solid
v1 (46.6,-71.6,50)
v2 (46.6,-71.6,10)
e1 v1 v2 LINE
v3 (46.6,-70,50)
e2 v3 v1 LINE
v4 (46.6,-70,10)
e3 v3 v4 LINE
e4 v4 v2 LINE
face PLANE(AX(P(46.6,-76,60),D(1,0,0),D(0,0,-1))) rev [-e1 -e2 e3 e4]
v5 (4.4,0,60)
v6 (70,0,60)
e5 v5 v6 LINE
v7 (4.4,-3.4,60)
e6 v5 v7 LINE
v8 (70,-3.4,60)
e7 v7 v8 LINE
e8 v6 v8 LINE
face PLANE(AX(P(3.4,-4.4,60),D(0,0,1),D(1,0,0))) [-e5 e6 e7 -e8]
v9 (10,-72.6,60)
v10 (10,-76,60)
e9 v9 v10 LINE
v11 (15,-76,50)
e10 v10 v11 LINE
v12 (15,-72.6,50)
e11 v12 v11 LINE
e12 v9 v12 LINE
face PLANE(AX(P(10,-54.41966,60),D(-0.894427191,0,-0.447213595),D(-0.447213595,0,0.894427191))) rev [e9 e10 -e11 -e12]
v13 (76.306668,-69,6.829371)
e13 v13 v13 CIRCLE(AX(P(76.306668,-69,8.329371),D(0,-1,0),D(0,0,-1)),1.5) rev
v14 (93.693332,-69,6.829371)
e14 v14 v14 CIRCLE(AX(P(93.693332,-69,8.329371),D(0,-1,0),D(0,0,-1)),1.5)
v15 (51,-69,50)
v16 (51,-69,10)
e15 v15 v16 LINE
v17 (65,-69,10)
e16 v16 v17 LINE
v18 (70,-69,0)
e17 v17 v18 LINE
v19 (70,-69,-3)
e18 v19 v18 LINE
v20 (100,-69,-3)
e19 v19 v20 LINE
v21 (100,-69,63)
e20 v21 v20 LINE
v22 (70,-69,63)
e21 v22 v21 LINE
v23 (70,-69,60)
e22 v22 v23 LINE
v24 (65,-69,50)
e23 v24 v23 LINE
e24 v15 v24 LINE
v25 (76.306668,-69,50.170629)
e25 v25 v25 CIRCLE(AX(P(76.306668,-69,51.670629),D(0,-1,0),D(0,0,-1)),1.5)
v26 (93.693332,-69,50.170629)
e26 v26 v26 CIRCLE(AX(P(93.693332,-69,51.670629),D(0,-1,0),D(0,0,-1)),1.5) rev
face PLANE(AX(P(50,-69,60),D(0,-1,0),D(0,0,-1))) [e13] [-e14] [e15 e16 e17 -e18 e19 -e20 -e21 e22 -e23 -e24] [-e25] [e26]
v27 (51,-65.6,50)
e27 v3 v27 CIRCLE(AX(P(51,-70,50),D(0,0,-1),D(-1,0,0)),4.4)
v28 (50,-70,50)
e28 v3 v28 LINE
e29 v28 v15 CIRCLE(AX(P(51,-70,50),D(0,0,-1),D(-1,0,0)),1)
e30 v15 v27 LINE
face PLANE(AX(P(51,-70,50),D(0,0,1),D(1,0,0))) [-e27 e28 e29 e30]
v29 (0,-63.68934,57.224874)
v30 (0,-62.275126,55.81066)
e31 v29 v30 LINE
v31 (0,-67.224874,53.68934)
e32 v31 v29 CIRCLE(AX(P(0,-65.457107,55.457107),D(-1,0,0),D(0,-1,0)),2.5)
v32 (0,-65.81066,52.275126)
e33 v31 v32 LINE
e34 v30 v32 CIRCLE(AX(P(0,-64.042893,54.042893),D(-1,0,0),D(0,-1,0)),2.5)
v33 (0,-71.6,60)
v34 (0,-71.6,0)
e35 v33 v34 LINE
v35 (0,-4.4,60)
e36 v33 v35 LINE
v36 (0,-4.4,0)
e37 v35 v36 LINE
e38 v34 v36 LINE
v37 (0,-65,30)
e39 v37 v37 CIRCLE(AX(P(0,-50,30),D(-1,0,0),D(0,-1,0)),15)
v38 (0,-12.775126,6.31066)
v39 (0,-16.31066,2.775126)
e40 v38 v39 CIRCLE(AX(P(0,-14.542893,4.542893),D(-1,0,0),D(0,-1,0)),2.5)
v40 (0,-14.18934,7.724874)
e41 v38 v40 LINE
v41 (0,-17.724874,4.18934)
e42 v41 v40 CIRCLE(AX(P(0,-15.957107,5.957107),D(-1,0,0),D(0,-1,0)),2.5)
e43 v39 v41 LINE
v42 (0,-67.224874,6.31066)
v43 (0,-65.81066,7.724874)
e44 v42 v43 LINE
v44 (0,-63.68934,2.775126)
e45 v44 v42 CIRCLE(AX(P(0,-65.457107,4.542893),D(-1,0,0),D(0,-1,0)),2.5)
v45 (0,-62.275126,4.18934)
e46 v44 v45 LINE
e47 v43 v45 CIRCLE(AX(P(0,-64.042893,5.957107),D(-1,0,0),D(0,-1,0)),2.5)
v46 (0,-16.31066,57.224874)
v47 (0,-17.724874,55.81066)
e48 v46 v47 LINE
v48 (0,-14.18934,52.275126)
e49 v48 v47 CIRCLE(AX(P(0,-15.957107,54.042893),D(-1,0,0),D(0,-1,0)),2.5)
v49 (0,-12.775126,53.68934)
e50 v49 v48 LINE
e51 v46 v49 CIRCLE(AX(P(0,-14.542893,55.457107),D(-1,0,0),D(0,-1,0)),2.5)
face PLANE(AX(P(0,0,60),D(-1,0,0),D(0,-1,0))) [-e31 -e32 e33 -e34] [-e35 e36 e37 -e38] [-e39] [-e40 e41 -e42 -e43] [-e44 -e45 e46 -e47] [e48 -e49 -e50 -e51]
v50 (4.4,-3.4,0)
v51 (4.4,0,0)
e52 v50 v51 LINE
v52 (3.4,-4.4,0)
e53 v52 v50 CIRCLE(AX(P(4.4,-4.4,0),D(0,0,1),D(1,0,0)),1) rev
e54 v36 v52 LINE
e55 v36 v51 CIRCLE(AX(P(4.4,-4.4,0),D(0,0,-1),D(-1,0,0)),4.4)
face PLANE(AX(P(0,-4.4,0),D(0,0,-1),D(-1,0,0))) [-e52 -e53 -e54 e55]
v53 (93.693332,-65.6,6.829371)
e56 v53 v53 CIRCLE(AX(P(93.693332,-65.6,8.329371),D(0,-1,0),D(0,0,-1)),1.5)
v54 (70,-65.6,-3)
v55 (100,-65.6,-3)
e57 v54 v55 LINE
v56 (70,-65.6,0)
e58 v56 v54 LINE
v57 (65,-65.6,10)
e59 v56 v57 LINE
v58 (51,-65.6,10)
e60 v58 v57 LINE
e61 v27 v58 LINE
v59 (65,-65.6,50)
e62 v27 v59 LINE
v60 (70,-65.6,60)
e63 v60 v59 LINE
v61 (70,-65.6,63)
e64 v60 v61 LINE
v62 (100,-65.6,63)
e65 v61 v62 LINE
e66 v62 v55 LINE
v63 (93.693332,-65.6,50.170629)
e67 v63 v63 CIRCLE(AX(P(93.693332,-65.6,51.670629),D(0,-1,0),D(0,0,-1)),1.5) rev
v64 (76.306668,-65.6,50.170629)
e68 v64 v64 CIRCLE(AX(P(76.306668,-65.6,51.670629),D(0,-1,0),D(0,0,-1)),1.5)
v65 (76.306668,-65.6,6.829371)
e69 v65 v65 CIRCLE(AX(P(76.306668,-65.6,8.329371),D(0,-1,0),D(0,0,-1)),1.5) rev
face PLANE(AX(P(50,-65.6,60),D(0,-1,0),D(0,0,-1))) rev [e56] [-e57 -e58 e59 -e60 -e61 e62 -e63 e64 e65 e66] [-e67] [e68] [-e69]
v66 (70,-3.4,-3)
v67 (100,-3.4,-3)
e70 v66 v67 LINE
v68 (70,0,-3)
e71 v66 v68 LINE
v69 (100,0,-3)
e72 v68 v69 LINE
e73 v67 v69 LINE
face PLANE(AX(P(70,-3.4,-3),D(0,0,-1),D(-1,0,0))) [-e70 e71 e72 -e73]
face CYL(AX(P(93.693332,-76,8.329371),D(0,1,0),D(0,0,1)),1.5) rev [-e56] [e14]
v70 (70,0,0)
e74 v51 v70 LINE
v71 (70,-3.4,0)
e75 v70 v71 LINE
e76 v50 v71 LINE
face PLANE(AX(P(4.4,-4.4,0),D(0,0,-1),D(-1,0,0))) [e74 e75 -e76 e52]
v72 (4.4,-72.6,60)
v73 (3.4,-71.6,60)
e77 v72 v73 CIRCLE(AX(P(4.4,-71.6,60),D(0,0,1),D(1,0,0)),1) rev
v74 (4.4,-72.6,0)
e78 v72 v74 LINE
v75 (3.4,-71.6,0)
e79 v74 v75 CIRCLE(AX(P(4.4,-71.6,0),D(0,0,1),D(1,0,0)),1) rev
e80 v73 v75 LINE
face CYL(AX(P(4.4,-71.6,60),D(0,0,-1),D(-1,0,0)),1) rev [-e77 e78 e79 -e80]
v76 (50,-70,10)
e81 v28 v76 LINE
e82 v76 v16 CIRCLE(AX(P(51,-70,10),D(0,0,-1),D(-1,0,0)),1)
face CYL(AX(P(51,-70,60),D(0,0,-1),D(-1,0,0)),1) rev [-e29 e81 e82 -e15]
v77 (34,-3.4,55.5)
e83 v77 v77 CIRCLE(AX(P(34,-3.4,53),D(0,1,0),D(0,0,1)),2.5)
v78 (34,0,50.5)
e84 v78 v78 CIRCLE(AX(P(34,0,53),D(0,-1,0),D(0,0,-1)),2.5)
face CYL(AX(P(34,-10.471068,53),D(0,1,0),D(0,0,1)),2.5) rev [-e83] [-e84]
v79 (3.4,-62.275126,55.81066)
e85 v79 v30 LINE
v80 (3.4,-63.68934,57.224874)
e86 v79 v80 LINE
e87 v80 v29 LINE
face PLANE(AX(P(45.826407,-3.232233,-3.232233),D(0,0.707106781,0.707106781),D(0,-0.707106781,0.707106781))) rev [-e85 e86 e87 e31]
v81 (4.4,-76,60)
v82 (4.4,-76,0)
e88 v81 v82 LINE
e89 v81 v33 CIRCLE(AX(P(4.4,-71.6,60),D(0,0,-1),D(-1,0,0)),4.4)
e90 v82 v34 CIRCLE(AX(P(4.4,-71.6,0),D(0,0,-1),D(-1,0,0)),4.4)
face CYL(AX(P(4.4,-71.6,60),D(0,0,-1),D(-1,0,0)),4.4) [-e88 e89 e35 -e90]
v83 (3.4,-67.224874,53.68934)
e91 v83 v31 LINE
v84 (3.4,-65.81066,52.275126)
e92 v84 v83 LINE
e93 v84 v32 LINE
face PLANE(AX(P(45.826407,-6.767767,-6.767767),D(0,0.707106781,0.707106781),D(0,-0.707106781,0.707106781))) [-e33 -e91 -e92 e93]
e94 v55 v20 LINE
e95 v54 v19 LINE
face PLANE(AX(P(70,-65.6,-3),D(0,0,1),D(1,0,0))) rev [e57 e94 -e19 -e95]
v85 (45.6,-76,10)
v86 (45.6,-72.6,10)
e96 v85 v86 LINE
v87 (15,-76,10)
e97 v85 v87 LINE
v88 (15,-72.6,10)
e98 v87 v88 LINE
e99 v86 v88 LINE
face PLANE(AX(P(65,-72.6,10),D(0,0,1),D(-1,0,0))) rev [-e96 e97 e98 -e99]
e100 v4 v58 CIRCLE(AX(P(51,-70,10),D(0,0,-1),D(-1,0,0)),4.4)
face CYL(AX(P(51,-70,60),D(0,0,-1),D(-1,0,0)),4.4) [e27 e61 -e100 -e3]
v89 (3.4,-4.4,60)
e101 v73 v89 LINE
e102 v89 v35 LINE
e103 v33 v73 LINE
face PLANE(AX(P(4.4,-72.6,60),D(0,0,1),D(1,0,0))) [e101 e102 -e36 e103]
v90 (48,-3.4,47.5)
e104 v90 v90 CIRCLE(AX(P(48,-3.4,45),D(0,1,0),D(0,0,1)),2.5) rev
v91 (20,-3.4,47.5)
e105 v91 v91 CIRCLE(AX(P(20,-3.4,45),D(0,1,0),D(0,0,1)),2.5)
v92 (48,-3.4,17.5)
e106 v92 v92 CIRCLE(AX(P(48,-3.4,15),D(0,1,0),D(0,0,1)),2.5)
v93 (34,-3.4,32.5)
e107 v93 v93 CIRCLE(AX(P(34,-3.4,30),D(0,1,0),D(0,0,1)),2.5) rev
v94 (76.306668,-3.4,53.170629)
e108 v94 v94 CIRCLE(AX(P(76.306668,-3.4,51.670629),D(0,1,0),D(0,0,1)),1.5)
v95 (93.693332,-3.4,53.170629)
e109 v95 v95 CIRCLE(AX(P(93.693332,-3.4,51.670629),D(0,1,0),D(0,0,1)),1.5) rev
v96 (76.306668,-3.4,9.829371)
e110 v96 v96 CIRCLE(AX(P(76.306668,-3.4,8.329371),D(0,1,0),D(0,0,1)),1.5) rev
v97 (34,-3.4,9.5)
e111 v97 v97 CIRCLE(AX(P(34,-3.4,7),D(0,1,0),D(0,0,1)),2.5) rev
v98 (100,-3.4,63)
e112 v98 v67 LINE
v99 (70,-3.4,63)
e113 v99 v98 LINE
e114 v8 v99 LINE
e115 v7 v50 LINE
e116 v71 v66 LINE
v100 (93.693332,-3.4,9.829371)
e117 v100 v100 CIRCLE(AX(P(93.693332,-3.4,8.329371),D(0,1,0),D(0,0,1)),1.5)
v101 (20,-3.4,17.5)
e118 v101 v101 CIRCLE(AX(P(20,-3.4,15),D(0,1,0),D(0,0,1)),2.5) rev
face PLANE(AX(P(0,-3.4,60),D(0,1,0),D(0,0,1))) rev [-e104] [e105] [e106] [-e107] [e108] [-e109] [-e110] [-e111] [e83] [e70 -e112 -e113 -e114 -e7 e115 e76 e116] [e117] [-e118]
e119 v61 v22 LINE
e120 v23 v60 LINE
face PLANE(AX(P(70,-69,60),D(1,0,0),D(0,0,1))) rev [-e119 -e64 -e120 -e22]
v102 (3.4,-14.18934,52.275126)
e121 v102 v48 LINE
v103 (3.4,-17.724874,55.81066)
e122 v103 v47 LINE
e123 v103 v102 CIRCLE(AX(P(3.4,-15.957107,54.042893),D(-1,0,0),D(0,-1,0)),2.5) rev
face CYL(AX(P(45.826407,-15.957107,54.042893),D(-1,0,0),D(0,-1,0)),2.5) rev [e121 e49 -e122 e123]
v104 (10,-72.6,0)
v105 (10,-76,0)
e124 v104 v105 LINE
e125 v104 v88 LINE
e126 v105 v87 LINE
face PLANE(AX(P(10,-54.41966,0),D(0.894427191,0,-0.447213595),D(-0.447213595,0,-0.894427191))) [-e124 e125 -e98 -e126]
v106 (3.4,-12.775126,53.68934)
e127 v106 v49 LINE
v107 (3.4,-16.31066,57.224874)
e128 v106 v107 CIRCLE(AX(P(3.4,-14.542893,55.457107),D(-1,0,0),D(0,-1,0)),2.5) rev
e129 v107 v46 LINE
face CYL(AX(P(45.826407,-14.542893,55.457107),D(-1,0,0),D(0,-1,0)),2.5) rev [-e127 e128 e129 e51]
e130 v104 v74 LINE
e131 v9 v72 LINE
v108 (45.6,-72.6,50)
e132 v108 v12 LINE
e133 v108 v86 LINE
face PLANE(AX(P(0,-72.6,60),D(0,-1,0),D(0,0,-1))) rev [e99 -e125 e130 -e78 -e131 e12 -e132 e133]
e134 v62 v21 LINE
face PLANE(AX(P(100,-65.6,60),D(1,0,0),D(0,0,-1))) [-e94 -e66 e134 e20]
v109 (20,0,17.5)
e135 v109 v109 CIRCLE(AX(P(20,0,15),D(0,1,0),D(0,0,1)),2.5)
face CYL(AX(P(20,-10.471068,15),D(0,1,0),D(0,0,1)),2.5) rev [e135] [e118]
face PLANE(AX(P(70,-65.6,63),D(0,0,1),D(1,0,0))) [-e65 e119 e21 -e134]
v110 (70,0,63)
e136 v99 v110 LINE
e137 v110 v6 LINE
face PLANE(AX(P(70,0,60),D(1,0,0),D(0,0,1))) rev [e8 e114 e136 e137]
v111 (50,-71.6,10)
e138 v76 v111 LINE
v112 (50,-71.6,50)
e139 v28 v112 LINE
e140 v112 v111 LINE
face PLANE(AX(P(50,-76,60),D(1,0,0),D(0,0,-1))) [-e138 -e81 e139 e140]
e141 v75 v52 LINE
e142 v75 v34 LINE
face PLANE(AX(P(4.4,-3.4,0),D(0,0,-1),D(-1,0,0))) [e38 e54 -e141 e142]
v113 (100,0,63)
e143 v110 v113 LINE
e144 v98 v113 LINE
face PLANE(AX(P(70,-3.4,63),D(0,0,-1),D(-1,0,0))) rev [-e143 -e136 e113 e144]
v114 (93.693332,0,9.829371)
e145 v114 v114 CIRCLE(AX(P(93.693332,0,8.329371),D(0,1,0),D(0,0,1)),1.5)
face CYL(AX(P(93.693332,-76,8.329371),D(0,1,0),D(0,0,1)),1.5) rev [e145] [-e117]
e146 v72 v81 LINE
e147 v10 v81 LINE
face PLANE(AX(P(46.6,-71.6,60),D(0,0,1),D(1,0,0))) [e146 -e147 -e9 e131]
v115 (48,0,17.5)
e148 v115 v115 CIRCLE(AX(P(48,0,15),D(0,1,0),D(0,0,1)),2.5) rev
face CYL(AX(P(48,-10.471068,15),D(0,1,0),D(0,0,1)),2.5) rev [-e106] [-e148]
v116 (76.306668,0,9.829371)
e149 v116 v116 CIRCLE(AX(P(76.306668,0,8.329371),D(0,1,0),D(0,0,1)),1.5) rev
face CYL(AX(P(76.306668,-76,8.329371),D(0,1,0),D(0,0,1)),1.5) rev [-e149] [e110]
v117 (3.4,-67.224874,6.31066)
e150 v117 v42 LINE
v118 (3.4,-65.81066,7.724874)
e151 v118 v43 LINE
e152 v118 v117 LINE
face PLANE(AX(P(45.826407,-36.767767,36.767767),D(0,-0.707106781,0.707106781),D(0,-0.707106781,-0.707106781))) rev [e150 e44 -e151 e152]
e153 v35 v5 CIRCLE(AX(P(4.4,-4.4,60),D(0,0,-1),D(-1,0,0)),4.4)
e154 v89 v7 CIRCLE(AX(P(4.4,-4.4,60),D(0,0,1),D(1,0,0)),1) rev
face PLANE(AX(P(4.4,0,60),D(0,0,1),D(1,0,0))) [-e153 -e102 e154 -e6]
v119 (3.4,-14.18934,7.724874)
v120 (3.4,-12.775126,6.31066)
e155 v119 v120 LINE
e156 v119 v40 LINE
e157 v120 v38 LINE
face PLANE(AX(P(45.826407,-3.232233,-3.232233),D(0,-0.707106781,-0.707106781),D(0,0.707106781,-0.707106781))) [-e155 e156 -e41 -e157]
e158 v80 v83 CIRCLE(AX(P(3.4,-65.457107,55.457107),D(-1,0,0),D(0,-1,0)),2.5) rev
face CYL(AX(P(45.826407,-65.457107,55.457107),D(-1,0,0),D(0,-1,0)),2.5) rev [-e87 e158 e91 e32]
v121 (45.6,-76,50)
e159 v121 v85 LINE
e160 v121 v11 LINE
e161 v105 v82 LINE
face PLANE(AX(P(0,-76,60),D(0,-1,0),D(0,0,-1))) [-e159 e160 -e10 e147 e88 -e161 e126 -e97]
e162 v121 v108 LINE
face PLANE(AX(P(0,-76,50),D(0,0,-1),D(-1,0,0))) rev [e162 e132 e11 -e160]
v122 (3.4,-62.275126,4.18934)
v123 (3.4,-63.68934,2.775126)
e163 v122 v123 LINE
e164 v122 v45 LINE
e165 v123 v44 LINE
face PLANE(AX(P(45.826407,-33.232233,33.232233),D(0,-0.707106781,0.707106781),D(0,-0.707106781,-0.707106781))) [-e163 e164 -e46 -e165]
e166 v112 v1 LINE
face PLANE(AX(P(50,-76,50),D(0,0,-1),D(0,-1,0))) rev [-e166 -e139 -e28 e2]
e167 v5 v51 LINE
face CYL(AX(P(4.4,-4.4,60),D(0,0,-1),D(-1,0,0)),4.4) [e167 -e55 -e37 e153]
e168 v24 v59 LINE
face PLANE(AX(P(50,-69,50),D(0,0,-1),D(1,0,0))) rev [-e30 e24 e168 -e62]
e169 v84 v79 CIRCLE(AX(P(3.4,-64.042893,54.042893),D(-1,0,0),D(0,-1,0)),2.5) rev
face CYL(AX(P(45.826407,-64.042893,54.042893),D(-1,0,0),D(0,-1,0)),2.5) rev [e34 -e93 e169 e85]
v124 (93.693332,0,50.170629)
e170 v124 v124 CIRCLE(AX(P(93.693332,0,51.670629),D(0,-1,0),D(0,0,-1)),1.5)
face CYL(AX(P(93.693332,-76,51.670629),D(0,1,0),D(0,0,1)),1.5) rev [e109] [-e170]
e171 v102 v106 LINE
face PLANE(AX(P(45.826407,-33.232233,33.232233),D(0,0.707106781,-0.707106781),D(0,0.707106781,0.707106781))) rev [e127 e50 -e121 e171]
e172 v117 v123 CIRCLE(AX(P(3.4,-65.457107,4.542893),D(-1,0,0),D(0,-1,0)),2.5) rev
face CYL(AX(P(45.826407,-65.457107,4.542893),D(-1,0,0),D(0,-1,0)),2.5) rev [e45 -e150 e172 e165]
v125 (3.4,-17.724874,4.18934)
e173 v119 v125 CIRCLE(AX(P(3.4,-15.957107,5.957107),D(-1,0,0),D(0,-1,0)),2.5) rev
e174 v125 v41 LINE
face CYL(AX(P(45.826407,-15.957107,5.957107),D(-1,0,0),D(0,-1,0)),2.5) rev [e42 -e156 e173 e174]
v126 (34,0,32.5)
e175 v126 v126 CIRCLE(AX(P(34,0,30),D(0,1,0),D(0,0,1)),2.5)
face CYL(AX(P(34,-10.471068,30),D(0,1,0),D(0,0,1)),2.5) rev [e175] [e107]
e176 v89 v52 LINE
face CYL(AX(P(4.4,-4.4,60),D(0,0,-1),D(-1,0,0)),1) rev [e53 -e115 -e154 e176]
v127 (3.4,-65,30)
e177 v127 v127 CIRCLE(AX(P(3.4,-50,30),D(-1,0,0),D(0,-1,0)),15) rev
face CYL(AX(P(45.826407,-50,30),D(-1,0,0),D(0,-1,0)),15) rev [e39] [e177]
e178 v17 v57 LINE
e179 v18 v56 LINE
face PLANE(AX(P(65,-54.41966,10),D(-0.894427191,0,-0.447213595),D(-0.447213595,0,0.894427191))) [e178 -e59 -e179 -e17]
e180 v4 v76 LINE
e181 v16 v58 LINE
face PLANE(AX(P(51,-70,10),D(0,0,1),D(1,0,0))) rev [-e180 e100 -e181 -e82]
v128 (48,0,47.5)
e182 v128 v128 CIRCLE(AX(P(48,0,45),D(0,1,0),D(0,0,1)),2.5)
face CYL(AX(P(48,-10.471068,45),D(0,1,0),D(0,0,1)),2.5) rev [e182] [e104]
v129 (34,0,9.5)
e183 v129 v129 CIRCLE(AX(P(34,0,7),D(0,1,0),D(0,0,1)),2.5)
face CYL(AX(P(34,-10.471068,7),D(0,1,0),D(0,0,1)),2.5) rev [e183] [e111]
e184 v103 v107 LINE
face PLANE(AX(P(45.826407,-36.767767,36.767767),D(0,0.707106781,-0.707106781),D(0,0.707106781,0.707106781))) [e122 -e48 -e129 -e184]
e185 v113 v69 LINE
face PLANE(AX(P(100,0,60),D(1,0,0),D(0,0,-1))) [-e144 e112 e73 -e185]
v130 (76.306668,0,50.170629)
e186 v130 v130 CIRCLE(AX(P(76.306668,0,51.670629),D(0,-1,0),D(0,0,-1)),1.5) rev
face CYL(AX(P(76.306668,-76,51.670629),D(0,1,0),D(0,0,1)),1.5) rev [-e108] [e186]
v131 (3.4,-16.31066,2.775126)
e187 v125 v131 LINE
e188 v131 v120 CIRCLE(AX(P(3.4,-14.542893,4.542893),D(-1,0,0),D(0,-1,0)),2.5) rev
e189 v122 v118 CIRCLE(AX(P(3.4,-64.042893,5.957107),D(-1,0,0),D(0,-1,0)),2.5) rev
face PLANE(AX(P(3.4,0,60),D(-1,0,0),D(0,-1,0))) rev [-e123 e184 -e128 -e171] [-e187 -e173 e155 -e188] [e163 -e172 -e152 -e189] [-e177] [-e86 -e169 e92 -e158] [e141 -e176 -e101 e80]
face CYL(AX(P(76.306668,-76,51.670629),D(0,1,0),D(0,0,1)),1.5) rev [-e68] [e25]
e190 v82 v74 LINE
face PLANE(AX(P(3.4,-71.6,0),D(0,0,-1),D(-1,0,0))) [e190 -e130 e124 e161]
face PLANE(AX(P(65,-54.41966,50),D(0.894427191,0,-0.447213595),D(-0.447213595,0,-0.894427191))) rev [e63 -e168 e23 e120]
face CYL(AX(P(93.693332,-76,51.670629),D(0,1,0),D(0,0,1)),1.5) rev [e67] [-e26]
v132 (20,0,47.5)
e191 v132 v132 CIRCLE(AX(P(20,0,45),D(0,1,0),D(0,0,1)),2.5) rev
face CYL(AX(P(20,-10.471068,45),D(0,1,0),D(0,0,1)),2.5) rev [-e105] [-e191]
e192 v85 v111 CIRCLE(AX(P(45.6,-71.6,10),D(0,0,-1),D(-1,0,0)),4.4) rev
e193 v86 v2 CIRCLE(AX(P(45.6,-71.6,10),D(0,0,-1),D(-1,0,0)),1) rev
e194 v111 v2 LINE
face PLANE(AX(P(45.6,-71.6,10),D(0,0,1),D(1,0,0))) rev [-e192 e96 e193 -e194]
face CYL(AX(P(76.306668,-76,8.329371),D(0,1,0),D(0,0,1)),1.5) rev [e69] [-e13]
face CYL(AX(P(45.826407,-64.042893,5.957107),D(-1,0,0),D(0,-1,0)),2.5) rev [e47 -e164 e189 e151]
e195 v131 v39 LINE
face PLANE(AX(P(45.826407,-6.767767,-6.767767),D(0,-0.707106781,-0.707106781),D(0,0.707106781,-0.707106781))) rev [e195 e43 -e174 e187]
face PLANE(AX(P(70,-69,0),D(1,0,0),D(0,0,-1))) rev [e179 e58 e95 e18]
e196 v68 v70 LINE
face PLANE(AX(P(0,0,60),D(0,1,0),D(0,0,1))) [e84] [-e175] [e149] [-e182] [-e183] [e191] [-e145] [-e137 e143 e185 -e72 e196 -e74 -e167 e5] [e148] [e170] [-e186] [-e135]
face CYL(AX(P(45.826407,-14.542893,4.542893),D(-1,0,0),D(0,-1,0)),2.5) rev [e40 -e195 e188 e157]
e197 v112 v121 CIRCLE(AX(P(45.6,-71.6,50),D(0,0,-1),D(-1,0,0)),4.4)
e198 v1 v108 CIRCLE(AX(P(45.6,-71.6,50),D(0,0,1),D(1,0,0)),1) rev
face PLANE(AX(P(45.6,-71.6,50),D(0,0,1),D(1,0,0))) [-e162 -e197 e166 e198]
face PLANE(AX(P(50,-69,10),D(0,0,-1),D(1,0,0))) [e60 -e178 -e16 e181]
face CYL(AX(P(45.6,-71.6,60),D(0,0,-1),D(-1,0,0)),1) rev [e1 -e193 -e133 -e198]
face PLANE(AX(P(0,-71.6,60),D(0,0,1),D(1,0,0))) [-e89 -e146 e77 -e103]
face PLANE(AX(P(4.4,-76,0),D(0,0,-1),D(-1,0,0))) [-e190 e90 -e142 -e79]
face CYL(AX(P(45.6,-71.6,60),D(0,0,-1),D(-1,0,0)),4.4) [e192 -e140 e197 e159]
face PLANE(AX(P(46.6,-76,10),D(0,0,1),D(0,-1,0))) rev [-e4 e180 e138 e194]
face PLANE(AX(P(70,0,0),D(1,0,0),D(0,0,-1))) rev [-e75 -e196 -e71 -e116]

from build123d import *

# Parameters (mm, degrees)
BASE_FLANGE1_DEPTH      = 60
SKETCH6_R               = 15
CUT_EXTRUDE1_DEPTH      = 3.4
CUT_EXTRUDE2_START      = -65
CUT_EXTRUDE2_OUTLINE_W  = 10
CUT_EXTRUDE2_OUTLINE_H  = 10.4
CUT_EXTRUDE2_DEPTH      = 50
SKETCH10_W              = 3
SKETCH10_H              = 3.4
BOSS_EXTRUDE1_DEPTH     = 30
MIRROR2_COPY_1_SKETCH_W = 3
MIRROR2_COPY_1_SKETCH_H = 3.4
MIRROR2_COPY_1_DEPTH    = 30
SKETCH13_R              = 1.5
CUT_EXTRUDE3_DEPTH      = 141.516902898
CUT_EXTRUDE6_REACH      = 142.517
SKETCH14_R              = 2.5
CUT_EXTRUDE7_START      = -3.4
CUT_EXTRUDE7_DEPTH      = 10.4


# Read off the part's stored shape, not the designer's step: Cut-Extrude2
# Sheet-metal steps are written as plain solids
with BuildPart() as part:
    # Sketch1 → Base-Flange1 (new body)
    with BuildSketch(Plane.XY):
        with BuildLine():
            Line((100, 0), (4.4, 0))
            ThreePointArc((4.4, 0), (1.288730163, -1.288730163), (0, -4.4))
            Line((0, -4.4), (0, -71.6))
            ThreePointArc((0, -71.6), (1.288730163, -74.711269837), (4.4, -76))
            Line((4.4, -76), (45.6, -76))
            ThreePointArc((45.6, -76), (48.711269837, -74.711269837), (50, -71.6))
            Line((50, -71.6), (50, -70))
            ThreePointArc((50, -70), (50.292893219, -69.292893219), (51, -69))
            Line((51, -69), (100, -69))
            Line((100, -69), (100, -65.6))
            Line((100, -65.6), (51, -65.6))
            ThreePointArc((51, -65.6), (47.888730163, -66.888730163), (46.6, -70))
            Line((46.6, -70), (46.6, -71.6))
            ThreePointArc((46.6, -71.6), (46.307106781, -72.307106781), (45.6, -72.6))
            Line((45.6, -72.6), (4.4, -72.6))
            ThreePointArc((4.4, -72.6), (3.692893219, -72.307106781), (3.4, -71.6))
            Line((3.4, -71.6), (3.4, -4.4))
            ThreePointArc((3.4, -4.4), (3.692893219, -3.692893219), (4.4, -3.4))
            Line((4.4, -3.4), (100, -3.4))
            Line((100, -3.4), (100, 0))
        make_face()
    extrude(amount=BASE_FLANGE1_DEPTH)

    # Sketch6 → Cut-Extrude1 (cut)
    with BuildSketch(Plane.ZY):
        with Locations(Location((30, -50, 0), (0, 0, 270))):
            Circle(SKETCH6_R)
        with BuildLine():
            Line((57.224873734, -63.689339828), (55.810660172, -62.275126266))
            ThreePointArc((55.810660172, -62.275126266), (52.275126266, -62.275126266), (52.275126266, -65.810660172))
            Line((52.275126266, -65.810660172), (53.689339828, -67.224873734))
            ThreePointArc((53.689339828, -67.224873734), (57.224873734, -67.224873734), (57.224873734, -63.689339828))
        make_face()
        with BuildLine():
            Line((2.775126266, -16.310660172), (4.189339828, -17.724873734))
            ThreePointArc((4.189339828, -17.724873734), (7.724873734, -17.724873734), (7.724873734, -14.189339828))
            Line((7.724873734, -14.189339828), (6.310660172, -12.775126266))
            ThreePointArc((6.310660172, -12.775126266), (2.775126266, -12.775126266), (2.775126266, -16.310660172))
        make_face()
        with BuildLine():
            Line((53.689339828, -12.775126266), (52.275126266, -14.189339828))
            ThreePointArc((52.275126266, -14.189339828), (52.275126266, -17.724873734), (55.810660172, -17.724873734))
            Line((55.810660172, -17.724873734), (57.224873734, -16.310660172))
            ThreePointArc((57.224873734, -16.310660172), (57.224873734, -12.775126266), (53.689339828, -12.775126266))
        make_face()
        with BuildLine():
            Line((6.310660172, -67.224873734), (7.724873734, -65.810660172))
            ThreePointArc((7.724873734, -65.810660172), (7.724873734, -62.275126266), (4.189339828, -62.275126266))
            Line((4.189339828, -62.275126266), (2.775126266, -63.689339828))
            ThreePointArc((2.775126266, -63.689339828), (2.775126266, -67.224873734), (6.310660172, -67.224873734))
        make_face()
    extrude(amount=-CUT_EXTRUDE1_DEPTH, mode=Mode.SUBTRACT)

    # Cut-Extrude2 outline → Cut-Extrude2 (cut)
    with BuildSketch(Plane.ZY.offset(CUT_EXTRUDE2_START)):
        with Locations((55, -70.8)):
            Rectangle(CUT_EXTRUDE2_OUTLINE_W, CUT_EXTRUDE2_OUTLINE_H)
        with Locations((5, -70.8)):
            Rectangle(CUT_EXTRUDE2_OUTLINE_W, CUT_EXTRUDE2_OUTLINE_H)
    extrude(amount=CUT_EXTRUDE2_DEPTH, mode=Mode.SUBTRACT)

    # Sketch10 → Boss-Extrude1 (add)
    with BuildSketch(Plane(origin=(100, 0, 0), x_dir=(0, 0, -1), z_dir=(1, 0, 0))):
        with Locations((1.5, -1.7)):
            Rectangle(SKETCH10_W, SKETCH10_H)
    boss_extrude1 = extrude(amount=-BOSS_EXTRUDE1_DEPTH)

    # Mirror1: Boss-Extrude1 across plane
    add(boss_extrude1.mirror(Plane(origin=(0, 0, 30), x_dir=(1, 0, 0), z_dir=(0, 0, -1))))

    # Mirror2: Boss-Extrude1 across plane
    add(boss_extrude1.mirror(Plane(origin=(0, -34.5, 0), x_dir=(0, 0, 1), z_dir=(0, -1, 0))))

    # Mirror2 copy 1 sketch → Mirror2 copy 1 (add)
    with BuildSketch(Plane(origin=(100, -69, 60), x_dir=(0, 0, 1), z_dir=(1, 0, 0))):
        with Locations((1.5, -1.7)):
            Rectangle(MIRROR2_COPY_1_SKETCH_W, MIRROR2_COPY_1_SKETCH_H)
    extrude(amount=-MIRROR2_COPY_1_DEPTH)

    # Sketch13 → Cut-Extrude3 (cut, through all)
    with BuildSketch(Plane(origin=(0, 0, 0), x_dir=(1, 0, 0), z_dir=(0, 1, 0))):
        with Locations(Location((76.306667563, -8.329371406, 0), (0, 0, 270))):
            Circle(SKETCH13_R)
        with Locations(Location((93.693332437, -8.329371406, 0), (0, 0, 270))):
            Circle(SKETCH13_R)
    cut_extrude3 = extrude(amount=-CUT_EXTRUDE3_DEPTH, mode=Mode.SUBTRACT)

    # Mirror3: Cut-Extrude3 across plane
    add(cut_extrude3.mirror(Plane(origin=(0, 0, 30), x_dir=(1, 0, 0), z_dir=(0, 0, -1))), mode=Mode.SUBTRACT)

    # Sketch14 → Cut-Extrude6 (cut, up to next)
    with BuildSketch(Plane(origin=(0, 0, 0), x_dir=(1, 0, 0), z_dir=(0, 1, 0)), mode=Mode.PRIVATE) as cut_extrude6_sk1:
        with Locations(Location((20, -15, 0), (0, 0, 270))):
            Circle(SKETCH14_R)
    cut_extrude6_tool1 = extrude(cut_extrude6_sk1.sketch, amount=-CUT_EXTRUDE6_REACH, mode=Mode.PRIVATE) & part.part
    # Sketch14 → Cut-Extrude6 (cut, up to next)
    with BuildSketch(Plane(origin=(0, 0, 0), x_dir=(1, 0, 0), z_dir=(0, 1, 0)), mode=Mode.PRIVATE) as cut_extrude6_sk2:
        with Locations(Location((48, -15, 0), (0, 0, 270))):
            Circle(SKETCH14_R)
    cut_extrude6_tool2 = extrude(cut_extrude6_sk2.sketch, amount=-CUT_EXTRUDE6_REACH, mode=Mode.PRIVATE) & part.part
    # Sketch14 → Cut-Extrude6 (cut, up to next)
    with BuildSketch(Plane(origin=(0, 0, 0), x_dir=(1, 0, 0), z_dir=(0, 1, 0)), mode=Mode.PRIVATE) as cut_extrude6_sk3:
        with Locations(Location((48, -45, 0), (0, 0, 270))):
            Circle(SKETCH14_R)
    cut_extrude6_tool3 = extrude(cut_extrude6_sk3.sketch, amount=-CUT_EXTRUDE6_REACH, mode=Mode.PRIVATE) & part.part
    # Sketch14 → Cut-Extrude6 (cut, up to next)
    with BuildSketch(Plane(origin=(0, 0, 0), x_dir=(1, 0, 0), z_dir=(0, 1, 0)), mode=Mode.PRIVATE) as cut_extrude6_sk4:
        with Locations(Location((20, -45, 0), (0, 0, 270))):
            Circle(SKETCH14_R)
    cut_extrude6_tool4 = extrude(cut_extrude6_sk4.sketch, amount=-CUT_EXTRUDE6_REACH, mode=Mode.PRIVATE) & part.part
    # Sketch14 → Cut-Extrude6 (cut, up to next)
    with BuildSketch(Plane(origin=(0, 0, 0), x_dir=(1, 0, 0), z_dir=(0, 1, 0)), mode=Mode.PRIVATE) as cut_extrude6_sk5:
        with Locations(Location((34, -30, 0), (0, 0, 270))):
            Circle(SKETCH14_R)
    cut_extrude6_tool5 = extrude(cut_extrude6_sk5.sketch, amount=-CUT_EXTRUDE6_REACH, mode=Mode.PRIVATE) & part.part
    # Sketch14 → Cut-Extrude6 (cut, up to next)
    with BuildSketch(Plane(origin=(0, 0, 0), x_dir=(1, 0, 0), z_dir=(0, 1, 0)), mode=Mode.PRIVATE) as cut_extrude6_sk6:
        with Locations(Location((34, -7, 0), (0, 0, 270))):
            Circle(SKETCH14_R)
    cut_extrude6_tool6 = extrude(cut_extrude6_sk6.sketch, amount=-CUT_EXTRUDE6_REACH, mode=Mode.PRIVATE) & part.part
    # Sketch14 → Cut-Extrude6 (cut, up to next)
    with BuildSketch(Plane(origin=(0, 0, 0), x_dir=(1, 0, 0), z_dir=(0, 1, 0)), mode=Mode.PRIVATE) as cut_extrude6_sk7:
        with Locations(Location((34, -53, 0), (0, 0, 270))):
            Circle(SKETCH14_R)
    cut_extrude6_tool7 = extrude(cut_extrude6_sk7.sketch, amount=-CUT_EXTRUDE6_REACH, mode=Mode.PRIVATE) & part.part
    add(cut_extrude6_tool1.solids().sort_by_distance((20, 0, 15))[0], mode=Mode.SUBTRACT)
    add(cut_extrude6_tool2.solids().sort_by_distance((48, 0, 15))[0], mode=Mode.SUBTRACT)
    add(cut_extrude6_tool3.solids().sort_by_distance((48, 0, 45))[0], mode=Mode.SUBTRACT)
    add(cut_extrude6_tool4.solids().sort_by_distance((20, 0, 45))[0], mode=Mode.SUBTRACT)
    add(cut_extrude6_tool5.solids().sort_by_distance((34, 0, 30))[0], mode=Mode.SUBTRACT)
    add(cut_extrude6_tool6.solids().sort_by_distance((34, 0, 7))[0], mode=Mode.SUBTRACT)
    add(cut_extrude6_tool7.solids().sort_by_distance((34, 0, 53))[0], mode=Mode.SUBTRACT)

    # Sketch15 → Cut-Extrude7 (cut)
    with BuildSketch(Plane.XZ.offset(69).offset(CUT_EXTRUDE7_START)):
        Polygon((65, 50), (70, 60), (65, 60), align=None)
        Polygon((15, 50), (15, 60), (10, 60), align=None)
    cut_extrude7 = extrude(amount=CUT_EXTRUDE7_DEPTH, mode=Mode.SUBTRACT)

    # Mirror4: Cut-Extrude7 across plane
    add(cut_extrude7.mirror(Plane(origin=(0, 0, 30), x_dir=(1, 0, 0), z_dir=(0, 0, -1))), mode=Mode.SUBTRACT)


solid = part.part
